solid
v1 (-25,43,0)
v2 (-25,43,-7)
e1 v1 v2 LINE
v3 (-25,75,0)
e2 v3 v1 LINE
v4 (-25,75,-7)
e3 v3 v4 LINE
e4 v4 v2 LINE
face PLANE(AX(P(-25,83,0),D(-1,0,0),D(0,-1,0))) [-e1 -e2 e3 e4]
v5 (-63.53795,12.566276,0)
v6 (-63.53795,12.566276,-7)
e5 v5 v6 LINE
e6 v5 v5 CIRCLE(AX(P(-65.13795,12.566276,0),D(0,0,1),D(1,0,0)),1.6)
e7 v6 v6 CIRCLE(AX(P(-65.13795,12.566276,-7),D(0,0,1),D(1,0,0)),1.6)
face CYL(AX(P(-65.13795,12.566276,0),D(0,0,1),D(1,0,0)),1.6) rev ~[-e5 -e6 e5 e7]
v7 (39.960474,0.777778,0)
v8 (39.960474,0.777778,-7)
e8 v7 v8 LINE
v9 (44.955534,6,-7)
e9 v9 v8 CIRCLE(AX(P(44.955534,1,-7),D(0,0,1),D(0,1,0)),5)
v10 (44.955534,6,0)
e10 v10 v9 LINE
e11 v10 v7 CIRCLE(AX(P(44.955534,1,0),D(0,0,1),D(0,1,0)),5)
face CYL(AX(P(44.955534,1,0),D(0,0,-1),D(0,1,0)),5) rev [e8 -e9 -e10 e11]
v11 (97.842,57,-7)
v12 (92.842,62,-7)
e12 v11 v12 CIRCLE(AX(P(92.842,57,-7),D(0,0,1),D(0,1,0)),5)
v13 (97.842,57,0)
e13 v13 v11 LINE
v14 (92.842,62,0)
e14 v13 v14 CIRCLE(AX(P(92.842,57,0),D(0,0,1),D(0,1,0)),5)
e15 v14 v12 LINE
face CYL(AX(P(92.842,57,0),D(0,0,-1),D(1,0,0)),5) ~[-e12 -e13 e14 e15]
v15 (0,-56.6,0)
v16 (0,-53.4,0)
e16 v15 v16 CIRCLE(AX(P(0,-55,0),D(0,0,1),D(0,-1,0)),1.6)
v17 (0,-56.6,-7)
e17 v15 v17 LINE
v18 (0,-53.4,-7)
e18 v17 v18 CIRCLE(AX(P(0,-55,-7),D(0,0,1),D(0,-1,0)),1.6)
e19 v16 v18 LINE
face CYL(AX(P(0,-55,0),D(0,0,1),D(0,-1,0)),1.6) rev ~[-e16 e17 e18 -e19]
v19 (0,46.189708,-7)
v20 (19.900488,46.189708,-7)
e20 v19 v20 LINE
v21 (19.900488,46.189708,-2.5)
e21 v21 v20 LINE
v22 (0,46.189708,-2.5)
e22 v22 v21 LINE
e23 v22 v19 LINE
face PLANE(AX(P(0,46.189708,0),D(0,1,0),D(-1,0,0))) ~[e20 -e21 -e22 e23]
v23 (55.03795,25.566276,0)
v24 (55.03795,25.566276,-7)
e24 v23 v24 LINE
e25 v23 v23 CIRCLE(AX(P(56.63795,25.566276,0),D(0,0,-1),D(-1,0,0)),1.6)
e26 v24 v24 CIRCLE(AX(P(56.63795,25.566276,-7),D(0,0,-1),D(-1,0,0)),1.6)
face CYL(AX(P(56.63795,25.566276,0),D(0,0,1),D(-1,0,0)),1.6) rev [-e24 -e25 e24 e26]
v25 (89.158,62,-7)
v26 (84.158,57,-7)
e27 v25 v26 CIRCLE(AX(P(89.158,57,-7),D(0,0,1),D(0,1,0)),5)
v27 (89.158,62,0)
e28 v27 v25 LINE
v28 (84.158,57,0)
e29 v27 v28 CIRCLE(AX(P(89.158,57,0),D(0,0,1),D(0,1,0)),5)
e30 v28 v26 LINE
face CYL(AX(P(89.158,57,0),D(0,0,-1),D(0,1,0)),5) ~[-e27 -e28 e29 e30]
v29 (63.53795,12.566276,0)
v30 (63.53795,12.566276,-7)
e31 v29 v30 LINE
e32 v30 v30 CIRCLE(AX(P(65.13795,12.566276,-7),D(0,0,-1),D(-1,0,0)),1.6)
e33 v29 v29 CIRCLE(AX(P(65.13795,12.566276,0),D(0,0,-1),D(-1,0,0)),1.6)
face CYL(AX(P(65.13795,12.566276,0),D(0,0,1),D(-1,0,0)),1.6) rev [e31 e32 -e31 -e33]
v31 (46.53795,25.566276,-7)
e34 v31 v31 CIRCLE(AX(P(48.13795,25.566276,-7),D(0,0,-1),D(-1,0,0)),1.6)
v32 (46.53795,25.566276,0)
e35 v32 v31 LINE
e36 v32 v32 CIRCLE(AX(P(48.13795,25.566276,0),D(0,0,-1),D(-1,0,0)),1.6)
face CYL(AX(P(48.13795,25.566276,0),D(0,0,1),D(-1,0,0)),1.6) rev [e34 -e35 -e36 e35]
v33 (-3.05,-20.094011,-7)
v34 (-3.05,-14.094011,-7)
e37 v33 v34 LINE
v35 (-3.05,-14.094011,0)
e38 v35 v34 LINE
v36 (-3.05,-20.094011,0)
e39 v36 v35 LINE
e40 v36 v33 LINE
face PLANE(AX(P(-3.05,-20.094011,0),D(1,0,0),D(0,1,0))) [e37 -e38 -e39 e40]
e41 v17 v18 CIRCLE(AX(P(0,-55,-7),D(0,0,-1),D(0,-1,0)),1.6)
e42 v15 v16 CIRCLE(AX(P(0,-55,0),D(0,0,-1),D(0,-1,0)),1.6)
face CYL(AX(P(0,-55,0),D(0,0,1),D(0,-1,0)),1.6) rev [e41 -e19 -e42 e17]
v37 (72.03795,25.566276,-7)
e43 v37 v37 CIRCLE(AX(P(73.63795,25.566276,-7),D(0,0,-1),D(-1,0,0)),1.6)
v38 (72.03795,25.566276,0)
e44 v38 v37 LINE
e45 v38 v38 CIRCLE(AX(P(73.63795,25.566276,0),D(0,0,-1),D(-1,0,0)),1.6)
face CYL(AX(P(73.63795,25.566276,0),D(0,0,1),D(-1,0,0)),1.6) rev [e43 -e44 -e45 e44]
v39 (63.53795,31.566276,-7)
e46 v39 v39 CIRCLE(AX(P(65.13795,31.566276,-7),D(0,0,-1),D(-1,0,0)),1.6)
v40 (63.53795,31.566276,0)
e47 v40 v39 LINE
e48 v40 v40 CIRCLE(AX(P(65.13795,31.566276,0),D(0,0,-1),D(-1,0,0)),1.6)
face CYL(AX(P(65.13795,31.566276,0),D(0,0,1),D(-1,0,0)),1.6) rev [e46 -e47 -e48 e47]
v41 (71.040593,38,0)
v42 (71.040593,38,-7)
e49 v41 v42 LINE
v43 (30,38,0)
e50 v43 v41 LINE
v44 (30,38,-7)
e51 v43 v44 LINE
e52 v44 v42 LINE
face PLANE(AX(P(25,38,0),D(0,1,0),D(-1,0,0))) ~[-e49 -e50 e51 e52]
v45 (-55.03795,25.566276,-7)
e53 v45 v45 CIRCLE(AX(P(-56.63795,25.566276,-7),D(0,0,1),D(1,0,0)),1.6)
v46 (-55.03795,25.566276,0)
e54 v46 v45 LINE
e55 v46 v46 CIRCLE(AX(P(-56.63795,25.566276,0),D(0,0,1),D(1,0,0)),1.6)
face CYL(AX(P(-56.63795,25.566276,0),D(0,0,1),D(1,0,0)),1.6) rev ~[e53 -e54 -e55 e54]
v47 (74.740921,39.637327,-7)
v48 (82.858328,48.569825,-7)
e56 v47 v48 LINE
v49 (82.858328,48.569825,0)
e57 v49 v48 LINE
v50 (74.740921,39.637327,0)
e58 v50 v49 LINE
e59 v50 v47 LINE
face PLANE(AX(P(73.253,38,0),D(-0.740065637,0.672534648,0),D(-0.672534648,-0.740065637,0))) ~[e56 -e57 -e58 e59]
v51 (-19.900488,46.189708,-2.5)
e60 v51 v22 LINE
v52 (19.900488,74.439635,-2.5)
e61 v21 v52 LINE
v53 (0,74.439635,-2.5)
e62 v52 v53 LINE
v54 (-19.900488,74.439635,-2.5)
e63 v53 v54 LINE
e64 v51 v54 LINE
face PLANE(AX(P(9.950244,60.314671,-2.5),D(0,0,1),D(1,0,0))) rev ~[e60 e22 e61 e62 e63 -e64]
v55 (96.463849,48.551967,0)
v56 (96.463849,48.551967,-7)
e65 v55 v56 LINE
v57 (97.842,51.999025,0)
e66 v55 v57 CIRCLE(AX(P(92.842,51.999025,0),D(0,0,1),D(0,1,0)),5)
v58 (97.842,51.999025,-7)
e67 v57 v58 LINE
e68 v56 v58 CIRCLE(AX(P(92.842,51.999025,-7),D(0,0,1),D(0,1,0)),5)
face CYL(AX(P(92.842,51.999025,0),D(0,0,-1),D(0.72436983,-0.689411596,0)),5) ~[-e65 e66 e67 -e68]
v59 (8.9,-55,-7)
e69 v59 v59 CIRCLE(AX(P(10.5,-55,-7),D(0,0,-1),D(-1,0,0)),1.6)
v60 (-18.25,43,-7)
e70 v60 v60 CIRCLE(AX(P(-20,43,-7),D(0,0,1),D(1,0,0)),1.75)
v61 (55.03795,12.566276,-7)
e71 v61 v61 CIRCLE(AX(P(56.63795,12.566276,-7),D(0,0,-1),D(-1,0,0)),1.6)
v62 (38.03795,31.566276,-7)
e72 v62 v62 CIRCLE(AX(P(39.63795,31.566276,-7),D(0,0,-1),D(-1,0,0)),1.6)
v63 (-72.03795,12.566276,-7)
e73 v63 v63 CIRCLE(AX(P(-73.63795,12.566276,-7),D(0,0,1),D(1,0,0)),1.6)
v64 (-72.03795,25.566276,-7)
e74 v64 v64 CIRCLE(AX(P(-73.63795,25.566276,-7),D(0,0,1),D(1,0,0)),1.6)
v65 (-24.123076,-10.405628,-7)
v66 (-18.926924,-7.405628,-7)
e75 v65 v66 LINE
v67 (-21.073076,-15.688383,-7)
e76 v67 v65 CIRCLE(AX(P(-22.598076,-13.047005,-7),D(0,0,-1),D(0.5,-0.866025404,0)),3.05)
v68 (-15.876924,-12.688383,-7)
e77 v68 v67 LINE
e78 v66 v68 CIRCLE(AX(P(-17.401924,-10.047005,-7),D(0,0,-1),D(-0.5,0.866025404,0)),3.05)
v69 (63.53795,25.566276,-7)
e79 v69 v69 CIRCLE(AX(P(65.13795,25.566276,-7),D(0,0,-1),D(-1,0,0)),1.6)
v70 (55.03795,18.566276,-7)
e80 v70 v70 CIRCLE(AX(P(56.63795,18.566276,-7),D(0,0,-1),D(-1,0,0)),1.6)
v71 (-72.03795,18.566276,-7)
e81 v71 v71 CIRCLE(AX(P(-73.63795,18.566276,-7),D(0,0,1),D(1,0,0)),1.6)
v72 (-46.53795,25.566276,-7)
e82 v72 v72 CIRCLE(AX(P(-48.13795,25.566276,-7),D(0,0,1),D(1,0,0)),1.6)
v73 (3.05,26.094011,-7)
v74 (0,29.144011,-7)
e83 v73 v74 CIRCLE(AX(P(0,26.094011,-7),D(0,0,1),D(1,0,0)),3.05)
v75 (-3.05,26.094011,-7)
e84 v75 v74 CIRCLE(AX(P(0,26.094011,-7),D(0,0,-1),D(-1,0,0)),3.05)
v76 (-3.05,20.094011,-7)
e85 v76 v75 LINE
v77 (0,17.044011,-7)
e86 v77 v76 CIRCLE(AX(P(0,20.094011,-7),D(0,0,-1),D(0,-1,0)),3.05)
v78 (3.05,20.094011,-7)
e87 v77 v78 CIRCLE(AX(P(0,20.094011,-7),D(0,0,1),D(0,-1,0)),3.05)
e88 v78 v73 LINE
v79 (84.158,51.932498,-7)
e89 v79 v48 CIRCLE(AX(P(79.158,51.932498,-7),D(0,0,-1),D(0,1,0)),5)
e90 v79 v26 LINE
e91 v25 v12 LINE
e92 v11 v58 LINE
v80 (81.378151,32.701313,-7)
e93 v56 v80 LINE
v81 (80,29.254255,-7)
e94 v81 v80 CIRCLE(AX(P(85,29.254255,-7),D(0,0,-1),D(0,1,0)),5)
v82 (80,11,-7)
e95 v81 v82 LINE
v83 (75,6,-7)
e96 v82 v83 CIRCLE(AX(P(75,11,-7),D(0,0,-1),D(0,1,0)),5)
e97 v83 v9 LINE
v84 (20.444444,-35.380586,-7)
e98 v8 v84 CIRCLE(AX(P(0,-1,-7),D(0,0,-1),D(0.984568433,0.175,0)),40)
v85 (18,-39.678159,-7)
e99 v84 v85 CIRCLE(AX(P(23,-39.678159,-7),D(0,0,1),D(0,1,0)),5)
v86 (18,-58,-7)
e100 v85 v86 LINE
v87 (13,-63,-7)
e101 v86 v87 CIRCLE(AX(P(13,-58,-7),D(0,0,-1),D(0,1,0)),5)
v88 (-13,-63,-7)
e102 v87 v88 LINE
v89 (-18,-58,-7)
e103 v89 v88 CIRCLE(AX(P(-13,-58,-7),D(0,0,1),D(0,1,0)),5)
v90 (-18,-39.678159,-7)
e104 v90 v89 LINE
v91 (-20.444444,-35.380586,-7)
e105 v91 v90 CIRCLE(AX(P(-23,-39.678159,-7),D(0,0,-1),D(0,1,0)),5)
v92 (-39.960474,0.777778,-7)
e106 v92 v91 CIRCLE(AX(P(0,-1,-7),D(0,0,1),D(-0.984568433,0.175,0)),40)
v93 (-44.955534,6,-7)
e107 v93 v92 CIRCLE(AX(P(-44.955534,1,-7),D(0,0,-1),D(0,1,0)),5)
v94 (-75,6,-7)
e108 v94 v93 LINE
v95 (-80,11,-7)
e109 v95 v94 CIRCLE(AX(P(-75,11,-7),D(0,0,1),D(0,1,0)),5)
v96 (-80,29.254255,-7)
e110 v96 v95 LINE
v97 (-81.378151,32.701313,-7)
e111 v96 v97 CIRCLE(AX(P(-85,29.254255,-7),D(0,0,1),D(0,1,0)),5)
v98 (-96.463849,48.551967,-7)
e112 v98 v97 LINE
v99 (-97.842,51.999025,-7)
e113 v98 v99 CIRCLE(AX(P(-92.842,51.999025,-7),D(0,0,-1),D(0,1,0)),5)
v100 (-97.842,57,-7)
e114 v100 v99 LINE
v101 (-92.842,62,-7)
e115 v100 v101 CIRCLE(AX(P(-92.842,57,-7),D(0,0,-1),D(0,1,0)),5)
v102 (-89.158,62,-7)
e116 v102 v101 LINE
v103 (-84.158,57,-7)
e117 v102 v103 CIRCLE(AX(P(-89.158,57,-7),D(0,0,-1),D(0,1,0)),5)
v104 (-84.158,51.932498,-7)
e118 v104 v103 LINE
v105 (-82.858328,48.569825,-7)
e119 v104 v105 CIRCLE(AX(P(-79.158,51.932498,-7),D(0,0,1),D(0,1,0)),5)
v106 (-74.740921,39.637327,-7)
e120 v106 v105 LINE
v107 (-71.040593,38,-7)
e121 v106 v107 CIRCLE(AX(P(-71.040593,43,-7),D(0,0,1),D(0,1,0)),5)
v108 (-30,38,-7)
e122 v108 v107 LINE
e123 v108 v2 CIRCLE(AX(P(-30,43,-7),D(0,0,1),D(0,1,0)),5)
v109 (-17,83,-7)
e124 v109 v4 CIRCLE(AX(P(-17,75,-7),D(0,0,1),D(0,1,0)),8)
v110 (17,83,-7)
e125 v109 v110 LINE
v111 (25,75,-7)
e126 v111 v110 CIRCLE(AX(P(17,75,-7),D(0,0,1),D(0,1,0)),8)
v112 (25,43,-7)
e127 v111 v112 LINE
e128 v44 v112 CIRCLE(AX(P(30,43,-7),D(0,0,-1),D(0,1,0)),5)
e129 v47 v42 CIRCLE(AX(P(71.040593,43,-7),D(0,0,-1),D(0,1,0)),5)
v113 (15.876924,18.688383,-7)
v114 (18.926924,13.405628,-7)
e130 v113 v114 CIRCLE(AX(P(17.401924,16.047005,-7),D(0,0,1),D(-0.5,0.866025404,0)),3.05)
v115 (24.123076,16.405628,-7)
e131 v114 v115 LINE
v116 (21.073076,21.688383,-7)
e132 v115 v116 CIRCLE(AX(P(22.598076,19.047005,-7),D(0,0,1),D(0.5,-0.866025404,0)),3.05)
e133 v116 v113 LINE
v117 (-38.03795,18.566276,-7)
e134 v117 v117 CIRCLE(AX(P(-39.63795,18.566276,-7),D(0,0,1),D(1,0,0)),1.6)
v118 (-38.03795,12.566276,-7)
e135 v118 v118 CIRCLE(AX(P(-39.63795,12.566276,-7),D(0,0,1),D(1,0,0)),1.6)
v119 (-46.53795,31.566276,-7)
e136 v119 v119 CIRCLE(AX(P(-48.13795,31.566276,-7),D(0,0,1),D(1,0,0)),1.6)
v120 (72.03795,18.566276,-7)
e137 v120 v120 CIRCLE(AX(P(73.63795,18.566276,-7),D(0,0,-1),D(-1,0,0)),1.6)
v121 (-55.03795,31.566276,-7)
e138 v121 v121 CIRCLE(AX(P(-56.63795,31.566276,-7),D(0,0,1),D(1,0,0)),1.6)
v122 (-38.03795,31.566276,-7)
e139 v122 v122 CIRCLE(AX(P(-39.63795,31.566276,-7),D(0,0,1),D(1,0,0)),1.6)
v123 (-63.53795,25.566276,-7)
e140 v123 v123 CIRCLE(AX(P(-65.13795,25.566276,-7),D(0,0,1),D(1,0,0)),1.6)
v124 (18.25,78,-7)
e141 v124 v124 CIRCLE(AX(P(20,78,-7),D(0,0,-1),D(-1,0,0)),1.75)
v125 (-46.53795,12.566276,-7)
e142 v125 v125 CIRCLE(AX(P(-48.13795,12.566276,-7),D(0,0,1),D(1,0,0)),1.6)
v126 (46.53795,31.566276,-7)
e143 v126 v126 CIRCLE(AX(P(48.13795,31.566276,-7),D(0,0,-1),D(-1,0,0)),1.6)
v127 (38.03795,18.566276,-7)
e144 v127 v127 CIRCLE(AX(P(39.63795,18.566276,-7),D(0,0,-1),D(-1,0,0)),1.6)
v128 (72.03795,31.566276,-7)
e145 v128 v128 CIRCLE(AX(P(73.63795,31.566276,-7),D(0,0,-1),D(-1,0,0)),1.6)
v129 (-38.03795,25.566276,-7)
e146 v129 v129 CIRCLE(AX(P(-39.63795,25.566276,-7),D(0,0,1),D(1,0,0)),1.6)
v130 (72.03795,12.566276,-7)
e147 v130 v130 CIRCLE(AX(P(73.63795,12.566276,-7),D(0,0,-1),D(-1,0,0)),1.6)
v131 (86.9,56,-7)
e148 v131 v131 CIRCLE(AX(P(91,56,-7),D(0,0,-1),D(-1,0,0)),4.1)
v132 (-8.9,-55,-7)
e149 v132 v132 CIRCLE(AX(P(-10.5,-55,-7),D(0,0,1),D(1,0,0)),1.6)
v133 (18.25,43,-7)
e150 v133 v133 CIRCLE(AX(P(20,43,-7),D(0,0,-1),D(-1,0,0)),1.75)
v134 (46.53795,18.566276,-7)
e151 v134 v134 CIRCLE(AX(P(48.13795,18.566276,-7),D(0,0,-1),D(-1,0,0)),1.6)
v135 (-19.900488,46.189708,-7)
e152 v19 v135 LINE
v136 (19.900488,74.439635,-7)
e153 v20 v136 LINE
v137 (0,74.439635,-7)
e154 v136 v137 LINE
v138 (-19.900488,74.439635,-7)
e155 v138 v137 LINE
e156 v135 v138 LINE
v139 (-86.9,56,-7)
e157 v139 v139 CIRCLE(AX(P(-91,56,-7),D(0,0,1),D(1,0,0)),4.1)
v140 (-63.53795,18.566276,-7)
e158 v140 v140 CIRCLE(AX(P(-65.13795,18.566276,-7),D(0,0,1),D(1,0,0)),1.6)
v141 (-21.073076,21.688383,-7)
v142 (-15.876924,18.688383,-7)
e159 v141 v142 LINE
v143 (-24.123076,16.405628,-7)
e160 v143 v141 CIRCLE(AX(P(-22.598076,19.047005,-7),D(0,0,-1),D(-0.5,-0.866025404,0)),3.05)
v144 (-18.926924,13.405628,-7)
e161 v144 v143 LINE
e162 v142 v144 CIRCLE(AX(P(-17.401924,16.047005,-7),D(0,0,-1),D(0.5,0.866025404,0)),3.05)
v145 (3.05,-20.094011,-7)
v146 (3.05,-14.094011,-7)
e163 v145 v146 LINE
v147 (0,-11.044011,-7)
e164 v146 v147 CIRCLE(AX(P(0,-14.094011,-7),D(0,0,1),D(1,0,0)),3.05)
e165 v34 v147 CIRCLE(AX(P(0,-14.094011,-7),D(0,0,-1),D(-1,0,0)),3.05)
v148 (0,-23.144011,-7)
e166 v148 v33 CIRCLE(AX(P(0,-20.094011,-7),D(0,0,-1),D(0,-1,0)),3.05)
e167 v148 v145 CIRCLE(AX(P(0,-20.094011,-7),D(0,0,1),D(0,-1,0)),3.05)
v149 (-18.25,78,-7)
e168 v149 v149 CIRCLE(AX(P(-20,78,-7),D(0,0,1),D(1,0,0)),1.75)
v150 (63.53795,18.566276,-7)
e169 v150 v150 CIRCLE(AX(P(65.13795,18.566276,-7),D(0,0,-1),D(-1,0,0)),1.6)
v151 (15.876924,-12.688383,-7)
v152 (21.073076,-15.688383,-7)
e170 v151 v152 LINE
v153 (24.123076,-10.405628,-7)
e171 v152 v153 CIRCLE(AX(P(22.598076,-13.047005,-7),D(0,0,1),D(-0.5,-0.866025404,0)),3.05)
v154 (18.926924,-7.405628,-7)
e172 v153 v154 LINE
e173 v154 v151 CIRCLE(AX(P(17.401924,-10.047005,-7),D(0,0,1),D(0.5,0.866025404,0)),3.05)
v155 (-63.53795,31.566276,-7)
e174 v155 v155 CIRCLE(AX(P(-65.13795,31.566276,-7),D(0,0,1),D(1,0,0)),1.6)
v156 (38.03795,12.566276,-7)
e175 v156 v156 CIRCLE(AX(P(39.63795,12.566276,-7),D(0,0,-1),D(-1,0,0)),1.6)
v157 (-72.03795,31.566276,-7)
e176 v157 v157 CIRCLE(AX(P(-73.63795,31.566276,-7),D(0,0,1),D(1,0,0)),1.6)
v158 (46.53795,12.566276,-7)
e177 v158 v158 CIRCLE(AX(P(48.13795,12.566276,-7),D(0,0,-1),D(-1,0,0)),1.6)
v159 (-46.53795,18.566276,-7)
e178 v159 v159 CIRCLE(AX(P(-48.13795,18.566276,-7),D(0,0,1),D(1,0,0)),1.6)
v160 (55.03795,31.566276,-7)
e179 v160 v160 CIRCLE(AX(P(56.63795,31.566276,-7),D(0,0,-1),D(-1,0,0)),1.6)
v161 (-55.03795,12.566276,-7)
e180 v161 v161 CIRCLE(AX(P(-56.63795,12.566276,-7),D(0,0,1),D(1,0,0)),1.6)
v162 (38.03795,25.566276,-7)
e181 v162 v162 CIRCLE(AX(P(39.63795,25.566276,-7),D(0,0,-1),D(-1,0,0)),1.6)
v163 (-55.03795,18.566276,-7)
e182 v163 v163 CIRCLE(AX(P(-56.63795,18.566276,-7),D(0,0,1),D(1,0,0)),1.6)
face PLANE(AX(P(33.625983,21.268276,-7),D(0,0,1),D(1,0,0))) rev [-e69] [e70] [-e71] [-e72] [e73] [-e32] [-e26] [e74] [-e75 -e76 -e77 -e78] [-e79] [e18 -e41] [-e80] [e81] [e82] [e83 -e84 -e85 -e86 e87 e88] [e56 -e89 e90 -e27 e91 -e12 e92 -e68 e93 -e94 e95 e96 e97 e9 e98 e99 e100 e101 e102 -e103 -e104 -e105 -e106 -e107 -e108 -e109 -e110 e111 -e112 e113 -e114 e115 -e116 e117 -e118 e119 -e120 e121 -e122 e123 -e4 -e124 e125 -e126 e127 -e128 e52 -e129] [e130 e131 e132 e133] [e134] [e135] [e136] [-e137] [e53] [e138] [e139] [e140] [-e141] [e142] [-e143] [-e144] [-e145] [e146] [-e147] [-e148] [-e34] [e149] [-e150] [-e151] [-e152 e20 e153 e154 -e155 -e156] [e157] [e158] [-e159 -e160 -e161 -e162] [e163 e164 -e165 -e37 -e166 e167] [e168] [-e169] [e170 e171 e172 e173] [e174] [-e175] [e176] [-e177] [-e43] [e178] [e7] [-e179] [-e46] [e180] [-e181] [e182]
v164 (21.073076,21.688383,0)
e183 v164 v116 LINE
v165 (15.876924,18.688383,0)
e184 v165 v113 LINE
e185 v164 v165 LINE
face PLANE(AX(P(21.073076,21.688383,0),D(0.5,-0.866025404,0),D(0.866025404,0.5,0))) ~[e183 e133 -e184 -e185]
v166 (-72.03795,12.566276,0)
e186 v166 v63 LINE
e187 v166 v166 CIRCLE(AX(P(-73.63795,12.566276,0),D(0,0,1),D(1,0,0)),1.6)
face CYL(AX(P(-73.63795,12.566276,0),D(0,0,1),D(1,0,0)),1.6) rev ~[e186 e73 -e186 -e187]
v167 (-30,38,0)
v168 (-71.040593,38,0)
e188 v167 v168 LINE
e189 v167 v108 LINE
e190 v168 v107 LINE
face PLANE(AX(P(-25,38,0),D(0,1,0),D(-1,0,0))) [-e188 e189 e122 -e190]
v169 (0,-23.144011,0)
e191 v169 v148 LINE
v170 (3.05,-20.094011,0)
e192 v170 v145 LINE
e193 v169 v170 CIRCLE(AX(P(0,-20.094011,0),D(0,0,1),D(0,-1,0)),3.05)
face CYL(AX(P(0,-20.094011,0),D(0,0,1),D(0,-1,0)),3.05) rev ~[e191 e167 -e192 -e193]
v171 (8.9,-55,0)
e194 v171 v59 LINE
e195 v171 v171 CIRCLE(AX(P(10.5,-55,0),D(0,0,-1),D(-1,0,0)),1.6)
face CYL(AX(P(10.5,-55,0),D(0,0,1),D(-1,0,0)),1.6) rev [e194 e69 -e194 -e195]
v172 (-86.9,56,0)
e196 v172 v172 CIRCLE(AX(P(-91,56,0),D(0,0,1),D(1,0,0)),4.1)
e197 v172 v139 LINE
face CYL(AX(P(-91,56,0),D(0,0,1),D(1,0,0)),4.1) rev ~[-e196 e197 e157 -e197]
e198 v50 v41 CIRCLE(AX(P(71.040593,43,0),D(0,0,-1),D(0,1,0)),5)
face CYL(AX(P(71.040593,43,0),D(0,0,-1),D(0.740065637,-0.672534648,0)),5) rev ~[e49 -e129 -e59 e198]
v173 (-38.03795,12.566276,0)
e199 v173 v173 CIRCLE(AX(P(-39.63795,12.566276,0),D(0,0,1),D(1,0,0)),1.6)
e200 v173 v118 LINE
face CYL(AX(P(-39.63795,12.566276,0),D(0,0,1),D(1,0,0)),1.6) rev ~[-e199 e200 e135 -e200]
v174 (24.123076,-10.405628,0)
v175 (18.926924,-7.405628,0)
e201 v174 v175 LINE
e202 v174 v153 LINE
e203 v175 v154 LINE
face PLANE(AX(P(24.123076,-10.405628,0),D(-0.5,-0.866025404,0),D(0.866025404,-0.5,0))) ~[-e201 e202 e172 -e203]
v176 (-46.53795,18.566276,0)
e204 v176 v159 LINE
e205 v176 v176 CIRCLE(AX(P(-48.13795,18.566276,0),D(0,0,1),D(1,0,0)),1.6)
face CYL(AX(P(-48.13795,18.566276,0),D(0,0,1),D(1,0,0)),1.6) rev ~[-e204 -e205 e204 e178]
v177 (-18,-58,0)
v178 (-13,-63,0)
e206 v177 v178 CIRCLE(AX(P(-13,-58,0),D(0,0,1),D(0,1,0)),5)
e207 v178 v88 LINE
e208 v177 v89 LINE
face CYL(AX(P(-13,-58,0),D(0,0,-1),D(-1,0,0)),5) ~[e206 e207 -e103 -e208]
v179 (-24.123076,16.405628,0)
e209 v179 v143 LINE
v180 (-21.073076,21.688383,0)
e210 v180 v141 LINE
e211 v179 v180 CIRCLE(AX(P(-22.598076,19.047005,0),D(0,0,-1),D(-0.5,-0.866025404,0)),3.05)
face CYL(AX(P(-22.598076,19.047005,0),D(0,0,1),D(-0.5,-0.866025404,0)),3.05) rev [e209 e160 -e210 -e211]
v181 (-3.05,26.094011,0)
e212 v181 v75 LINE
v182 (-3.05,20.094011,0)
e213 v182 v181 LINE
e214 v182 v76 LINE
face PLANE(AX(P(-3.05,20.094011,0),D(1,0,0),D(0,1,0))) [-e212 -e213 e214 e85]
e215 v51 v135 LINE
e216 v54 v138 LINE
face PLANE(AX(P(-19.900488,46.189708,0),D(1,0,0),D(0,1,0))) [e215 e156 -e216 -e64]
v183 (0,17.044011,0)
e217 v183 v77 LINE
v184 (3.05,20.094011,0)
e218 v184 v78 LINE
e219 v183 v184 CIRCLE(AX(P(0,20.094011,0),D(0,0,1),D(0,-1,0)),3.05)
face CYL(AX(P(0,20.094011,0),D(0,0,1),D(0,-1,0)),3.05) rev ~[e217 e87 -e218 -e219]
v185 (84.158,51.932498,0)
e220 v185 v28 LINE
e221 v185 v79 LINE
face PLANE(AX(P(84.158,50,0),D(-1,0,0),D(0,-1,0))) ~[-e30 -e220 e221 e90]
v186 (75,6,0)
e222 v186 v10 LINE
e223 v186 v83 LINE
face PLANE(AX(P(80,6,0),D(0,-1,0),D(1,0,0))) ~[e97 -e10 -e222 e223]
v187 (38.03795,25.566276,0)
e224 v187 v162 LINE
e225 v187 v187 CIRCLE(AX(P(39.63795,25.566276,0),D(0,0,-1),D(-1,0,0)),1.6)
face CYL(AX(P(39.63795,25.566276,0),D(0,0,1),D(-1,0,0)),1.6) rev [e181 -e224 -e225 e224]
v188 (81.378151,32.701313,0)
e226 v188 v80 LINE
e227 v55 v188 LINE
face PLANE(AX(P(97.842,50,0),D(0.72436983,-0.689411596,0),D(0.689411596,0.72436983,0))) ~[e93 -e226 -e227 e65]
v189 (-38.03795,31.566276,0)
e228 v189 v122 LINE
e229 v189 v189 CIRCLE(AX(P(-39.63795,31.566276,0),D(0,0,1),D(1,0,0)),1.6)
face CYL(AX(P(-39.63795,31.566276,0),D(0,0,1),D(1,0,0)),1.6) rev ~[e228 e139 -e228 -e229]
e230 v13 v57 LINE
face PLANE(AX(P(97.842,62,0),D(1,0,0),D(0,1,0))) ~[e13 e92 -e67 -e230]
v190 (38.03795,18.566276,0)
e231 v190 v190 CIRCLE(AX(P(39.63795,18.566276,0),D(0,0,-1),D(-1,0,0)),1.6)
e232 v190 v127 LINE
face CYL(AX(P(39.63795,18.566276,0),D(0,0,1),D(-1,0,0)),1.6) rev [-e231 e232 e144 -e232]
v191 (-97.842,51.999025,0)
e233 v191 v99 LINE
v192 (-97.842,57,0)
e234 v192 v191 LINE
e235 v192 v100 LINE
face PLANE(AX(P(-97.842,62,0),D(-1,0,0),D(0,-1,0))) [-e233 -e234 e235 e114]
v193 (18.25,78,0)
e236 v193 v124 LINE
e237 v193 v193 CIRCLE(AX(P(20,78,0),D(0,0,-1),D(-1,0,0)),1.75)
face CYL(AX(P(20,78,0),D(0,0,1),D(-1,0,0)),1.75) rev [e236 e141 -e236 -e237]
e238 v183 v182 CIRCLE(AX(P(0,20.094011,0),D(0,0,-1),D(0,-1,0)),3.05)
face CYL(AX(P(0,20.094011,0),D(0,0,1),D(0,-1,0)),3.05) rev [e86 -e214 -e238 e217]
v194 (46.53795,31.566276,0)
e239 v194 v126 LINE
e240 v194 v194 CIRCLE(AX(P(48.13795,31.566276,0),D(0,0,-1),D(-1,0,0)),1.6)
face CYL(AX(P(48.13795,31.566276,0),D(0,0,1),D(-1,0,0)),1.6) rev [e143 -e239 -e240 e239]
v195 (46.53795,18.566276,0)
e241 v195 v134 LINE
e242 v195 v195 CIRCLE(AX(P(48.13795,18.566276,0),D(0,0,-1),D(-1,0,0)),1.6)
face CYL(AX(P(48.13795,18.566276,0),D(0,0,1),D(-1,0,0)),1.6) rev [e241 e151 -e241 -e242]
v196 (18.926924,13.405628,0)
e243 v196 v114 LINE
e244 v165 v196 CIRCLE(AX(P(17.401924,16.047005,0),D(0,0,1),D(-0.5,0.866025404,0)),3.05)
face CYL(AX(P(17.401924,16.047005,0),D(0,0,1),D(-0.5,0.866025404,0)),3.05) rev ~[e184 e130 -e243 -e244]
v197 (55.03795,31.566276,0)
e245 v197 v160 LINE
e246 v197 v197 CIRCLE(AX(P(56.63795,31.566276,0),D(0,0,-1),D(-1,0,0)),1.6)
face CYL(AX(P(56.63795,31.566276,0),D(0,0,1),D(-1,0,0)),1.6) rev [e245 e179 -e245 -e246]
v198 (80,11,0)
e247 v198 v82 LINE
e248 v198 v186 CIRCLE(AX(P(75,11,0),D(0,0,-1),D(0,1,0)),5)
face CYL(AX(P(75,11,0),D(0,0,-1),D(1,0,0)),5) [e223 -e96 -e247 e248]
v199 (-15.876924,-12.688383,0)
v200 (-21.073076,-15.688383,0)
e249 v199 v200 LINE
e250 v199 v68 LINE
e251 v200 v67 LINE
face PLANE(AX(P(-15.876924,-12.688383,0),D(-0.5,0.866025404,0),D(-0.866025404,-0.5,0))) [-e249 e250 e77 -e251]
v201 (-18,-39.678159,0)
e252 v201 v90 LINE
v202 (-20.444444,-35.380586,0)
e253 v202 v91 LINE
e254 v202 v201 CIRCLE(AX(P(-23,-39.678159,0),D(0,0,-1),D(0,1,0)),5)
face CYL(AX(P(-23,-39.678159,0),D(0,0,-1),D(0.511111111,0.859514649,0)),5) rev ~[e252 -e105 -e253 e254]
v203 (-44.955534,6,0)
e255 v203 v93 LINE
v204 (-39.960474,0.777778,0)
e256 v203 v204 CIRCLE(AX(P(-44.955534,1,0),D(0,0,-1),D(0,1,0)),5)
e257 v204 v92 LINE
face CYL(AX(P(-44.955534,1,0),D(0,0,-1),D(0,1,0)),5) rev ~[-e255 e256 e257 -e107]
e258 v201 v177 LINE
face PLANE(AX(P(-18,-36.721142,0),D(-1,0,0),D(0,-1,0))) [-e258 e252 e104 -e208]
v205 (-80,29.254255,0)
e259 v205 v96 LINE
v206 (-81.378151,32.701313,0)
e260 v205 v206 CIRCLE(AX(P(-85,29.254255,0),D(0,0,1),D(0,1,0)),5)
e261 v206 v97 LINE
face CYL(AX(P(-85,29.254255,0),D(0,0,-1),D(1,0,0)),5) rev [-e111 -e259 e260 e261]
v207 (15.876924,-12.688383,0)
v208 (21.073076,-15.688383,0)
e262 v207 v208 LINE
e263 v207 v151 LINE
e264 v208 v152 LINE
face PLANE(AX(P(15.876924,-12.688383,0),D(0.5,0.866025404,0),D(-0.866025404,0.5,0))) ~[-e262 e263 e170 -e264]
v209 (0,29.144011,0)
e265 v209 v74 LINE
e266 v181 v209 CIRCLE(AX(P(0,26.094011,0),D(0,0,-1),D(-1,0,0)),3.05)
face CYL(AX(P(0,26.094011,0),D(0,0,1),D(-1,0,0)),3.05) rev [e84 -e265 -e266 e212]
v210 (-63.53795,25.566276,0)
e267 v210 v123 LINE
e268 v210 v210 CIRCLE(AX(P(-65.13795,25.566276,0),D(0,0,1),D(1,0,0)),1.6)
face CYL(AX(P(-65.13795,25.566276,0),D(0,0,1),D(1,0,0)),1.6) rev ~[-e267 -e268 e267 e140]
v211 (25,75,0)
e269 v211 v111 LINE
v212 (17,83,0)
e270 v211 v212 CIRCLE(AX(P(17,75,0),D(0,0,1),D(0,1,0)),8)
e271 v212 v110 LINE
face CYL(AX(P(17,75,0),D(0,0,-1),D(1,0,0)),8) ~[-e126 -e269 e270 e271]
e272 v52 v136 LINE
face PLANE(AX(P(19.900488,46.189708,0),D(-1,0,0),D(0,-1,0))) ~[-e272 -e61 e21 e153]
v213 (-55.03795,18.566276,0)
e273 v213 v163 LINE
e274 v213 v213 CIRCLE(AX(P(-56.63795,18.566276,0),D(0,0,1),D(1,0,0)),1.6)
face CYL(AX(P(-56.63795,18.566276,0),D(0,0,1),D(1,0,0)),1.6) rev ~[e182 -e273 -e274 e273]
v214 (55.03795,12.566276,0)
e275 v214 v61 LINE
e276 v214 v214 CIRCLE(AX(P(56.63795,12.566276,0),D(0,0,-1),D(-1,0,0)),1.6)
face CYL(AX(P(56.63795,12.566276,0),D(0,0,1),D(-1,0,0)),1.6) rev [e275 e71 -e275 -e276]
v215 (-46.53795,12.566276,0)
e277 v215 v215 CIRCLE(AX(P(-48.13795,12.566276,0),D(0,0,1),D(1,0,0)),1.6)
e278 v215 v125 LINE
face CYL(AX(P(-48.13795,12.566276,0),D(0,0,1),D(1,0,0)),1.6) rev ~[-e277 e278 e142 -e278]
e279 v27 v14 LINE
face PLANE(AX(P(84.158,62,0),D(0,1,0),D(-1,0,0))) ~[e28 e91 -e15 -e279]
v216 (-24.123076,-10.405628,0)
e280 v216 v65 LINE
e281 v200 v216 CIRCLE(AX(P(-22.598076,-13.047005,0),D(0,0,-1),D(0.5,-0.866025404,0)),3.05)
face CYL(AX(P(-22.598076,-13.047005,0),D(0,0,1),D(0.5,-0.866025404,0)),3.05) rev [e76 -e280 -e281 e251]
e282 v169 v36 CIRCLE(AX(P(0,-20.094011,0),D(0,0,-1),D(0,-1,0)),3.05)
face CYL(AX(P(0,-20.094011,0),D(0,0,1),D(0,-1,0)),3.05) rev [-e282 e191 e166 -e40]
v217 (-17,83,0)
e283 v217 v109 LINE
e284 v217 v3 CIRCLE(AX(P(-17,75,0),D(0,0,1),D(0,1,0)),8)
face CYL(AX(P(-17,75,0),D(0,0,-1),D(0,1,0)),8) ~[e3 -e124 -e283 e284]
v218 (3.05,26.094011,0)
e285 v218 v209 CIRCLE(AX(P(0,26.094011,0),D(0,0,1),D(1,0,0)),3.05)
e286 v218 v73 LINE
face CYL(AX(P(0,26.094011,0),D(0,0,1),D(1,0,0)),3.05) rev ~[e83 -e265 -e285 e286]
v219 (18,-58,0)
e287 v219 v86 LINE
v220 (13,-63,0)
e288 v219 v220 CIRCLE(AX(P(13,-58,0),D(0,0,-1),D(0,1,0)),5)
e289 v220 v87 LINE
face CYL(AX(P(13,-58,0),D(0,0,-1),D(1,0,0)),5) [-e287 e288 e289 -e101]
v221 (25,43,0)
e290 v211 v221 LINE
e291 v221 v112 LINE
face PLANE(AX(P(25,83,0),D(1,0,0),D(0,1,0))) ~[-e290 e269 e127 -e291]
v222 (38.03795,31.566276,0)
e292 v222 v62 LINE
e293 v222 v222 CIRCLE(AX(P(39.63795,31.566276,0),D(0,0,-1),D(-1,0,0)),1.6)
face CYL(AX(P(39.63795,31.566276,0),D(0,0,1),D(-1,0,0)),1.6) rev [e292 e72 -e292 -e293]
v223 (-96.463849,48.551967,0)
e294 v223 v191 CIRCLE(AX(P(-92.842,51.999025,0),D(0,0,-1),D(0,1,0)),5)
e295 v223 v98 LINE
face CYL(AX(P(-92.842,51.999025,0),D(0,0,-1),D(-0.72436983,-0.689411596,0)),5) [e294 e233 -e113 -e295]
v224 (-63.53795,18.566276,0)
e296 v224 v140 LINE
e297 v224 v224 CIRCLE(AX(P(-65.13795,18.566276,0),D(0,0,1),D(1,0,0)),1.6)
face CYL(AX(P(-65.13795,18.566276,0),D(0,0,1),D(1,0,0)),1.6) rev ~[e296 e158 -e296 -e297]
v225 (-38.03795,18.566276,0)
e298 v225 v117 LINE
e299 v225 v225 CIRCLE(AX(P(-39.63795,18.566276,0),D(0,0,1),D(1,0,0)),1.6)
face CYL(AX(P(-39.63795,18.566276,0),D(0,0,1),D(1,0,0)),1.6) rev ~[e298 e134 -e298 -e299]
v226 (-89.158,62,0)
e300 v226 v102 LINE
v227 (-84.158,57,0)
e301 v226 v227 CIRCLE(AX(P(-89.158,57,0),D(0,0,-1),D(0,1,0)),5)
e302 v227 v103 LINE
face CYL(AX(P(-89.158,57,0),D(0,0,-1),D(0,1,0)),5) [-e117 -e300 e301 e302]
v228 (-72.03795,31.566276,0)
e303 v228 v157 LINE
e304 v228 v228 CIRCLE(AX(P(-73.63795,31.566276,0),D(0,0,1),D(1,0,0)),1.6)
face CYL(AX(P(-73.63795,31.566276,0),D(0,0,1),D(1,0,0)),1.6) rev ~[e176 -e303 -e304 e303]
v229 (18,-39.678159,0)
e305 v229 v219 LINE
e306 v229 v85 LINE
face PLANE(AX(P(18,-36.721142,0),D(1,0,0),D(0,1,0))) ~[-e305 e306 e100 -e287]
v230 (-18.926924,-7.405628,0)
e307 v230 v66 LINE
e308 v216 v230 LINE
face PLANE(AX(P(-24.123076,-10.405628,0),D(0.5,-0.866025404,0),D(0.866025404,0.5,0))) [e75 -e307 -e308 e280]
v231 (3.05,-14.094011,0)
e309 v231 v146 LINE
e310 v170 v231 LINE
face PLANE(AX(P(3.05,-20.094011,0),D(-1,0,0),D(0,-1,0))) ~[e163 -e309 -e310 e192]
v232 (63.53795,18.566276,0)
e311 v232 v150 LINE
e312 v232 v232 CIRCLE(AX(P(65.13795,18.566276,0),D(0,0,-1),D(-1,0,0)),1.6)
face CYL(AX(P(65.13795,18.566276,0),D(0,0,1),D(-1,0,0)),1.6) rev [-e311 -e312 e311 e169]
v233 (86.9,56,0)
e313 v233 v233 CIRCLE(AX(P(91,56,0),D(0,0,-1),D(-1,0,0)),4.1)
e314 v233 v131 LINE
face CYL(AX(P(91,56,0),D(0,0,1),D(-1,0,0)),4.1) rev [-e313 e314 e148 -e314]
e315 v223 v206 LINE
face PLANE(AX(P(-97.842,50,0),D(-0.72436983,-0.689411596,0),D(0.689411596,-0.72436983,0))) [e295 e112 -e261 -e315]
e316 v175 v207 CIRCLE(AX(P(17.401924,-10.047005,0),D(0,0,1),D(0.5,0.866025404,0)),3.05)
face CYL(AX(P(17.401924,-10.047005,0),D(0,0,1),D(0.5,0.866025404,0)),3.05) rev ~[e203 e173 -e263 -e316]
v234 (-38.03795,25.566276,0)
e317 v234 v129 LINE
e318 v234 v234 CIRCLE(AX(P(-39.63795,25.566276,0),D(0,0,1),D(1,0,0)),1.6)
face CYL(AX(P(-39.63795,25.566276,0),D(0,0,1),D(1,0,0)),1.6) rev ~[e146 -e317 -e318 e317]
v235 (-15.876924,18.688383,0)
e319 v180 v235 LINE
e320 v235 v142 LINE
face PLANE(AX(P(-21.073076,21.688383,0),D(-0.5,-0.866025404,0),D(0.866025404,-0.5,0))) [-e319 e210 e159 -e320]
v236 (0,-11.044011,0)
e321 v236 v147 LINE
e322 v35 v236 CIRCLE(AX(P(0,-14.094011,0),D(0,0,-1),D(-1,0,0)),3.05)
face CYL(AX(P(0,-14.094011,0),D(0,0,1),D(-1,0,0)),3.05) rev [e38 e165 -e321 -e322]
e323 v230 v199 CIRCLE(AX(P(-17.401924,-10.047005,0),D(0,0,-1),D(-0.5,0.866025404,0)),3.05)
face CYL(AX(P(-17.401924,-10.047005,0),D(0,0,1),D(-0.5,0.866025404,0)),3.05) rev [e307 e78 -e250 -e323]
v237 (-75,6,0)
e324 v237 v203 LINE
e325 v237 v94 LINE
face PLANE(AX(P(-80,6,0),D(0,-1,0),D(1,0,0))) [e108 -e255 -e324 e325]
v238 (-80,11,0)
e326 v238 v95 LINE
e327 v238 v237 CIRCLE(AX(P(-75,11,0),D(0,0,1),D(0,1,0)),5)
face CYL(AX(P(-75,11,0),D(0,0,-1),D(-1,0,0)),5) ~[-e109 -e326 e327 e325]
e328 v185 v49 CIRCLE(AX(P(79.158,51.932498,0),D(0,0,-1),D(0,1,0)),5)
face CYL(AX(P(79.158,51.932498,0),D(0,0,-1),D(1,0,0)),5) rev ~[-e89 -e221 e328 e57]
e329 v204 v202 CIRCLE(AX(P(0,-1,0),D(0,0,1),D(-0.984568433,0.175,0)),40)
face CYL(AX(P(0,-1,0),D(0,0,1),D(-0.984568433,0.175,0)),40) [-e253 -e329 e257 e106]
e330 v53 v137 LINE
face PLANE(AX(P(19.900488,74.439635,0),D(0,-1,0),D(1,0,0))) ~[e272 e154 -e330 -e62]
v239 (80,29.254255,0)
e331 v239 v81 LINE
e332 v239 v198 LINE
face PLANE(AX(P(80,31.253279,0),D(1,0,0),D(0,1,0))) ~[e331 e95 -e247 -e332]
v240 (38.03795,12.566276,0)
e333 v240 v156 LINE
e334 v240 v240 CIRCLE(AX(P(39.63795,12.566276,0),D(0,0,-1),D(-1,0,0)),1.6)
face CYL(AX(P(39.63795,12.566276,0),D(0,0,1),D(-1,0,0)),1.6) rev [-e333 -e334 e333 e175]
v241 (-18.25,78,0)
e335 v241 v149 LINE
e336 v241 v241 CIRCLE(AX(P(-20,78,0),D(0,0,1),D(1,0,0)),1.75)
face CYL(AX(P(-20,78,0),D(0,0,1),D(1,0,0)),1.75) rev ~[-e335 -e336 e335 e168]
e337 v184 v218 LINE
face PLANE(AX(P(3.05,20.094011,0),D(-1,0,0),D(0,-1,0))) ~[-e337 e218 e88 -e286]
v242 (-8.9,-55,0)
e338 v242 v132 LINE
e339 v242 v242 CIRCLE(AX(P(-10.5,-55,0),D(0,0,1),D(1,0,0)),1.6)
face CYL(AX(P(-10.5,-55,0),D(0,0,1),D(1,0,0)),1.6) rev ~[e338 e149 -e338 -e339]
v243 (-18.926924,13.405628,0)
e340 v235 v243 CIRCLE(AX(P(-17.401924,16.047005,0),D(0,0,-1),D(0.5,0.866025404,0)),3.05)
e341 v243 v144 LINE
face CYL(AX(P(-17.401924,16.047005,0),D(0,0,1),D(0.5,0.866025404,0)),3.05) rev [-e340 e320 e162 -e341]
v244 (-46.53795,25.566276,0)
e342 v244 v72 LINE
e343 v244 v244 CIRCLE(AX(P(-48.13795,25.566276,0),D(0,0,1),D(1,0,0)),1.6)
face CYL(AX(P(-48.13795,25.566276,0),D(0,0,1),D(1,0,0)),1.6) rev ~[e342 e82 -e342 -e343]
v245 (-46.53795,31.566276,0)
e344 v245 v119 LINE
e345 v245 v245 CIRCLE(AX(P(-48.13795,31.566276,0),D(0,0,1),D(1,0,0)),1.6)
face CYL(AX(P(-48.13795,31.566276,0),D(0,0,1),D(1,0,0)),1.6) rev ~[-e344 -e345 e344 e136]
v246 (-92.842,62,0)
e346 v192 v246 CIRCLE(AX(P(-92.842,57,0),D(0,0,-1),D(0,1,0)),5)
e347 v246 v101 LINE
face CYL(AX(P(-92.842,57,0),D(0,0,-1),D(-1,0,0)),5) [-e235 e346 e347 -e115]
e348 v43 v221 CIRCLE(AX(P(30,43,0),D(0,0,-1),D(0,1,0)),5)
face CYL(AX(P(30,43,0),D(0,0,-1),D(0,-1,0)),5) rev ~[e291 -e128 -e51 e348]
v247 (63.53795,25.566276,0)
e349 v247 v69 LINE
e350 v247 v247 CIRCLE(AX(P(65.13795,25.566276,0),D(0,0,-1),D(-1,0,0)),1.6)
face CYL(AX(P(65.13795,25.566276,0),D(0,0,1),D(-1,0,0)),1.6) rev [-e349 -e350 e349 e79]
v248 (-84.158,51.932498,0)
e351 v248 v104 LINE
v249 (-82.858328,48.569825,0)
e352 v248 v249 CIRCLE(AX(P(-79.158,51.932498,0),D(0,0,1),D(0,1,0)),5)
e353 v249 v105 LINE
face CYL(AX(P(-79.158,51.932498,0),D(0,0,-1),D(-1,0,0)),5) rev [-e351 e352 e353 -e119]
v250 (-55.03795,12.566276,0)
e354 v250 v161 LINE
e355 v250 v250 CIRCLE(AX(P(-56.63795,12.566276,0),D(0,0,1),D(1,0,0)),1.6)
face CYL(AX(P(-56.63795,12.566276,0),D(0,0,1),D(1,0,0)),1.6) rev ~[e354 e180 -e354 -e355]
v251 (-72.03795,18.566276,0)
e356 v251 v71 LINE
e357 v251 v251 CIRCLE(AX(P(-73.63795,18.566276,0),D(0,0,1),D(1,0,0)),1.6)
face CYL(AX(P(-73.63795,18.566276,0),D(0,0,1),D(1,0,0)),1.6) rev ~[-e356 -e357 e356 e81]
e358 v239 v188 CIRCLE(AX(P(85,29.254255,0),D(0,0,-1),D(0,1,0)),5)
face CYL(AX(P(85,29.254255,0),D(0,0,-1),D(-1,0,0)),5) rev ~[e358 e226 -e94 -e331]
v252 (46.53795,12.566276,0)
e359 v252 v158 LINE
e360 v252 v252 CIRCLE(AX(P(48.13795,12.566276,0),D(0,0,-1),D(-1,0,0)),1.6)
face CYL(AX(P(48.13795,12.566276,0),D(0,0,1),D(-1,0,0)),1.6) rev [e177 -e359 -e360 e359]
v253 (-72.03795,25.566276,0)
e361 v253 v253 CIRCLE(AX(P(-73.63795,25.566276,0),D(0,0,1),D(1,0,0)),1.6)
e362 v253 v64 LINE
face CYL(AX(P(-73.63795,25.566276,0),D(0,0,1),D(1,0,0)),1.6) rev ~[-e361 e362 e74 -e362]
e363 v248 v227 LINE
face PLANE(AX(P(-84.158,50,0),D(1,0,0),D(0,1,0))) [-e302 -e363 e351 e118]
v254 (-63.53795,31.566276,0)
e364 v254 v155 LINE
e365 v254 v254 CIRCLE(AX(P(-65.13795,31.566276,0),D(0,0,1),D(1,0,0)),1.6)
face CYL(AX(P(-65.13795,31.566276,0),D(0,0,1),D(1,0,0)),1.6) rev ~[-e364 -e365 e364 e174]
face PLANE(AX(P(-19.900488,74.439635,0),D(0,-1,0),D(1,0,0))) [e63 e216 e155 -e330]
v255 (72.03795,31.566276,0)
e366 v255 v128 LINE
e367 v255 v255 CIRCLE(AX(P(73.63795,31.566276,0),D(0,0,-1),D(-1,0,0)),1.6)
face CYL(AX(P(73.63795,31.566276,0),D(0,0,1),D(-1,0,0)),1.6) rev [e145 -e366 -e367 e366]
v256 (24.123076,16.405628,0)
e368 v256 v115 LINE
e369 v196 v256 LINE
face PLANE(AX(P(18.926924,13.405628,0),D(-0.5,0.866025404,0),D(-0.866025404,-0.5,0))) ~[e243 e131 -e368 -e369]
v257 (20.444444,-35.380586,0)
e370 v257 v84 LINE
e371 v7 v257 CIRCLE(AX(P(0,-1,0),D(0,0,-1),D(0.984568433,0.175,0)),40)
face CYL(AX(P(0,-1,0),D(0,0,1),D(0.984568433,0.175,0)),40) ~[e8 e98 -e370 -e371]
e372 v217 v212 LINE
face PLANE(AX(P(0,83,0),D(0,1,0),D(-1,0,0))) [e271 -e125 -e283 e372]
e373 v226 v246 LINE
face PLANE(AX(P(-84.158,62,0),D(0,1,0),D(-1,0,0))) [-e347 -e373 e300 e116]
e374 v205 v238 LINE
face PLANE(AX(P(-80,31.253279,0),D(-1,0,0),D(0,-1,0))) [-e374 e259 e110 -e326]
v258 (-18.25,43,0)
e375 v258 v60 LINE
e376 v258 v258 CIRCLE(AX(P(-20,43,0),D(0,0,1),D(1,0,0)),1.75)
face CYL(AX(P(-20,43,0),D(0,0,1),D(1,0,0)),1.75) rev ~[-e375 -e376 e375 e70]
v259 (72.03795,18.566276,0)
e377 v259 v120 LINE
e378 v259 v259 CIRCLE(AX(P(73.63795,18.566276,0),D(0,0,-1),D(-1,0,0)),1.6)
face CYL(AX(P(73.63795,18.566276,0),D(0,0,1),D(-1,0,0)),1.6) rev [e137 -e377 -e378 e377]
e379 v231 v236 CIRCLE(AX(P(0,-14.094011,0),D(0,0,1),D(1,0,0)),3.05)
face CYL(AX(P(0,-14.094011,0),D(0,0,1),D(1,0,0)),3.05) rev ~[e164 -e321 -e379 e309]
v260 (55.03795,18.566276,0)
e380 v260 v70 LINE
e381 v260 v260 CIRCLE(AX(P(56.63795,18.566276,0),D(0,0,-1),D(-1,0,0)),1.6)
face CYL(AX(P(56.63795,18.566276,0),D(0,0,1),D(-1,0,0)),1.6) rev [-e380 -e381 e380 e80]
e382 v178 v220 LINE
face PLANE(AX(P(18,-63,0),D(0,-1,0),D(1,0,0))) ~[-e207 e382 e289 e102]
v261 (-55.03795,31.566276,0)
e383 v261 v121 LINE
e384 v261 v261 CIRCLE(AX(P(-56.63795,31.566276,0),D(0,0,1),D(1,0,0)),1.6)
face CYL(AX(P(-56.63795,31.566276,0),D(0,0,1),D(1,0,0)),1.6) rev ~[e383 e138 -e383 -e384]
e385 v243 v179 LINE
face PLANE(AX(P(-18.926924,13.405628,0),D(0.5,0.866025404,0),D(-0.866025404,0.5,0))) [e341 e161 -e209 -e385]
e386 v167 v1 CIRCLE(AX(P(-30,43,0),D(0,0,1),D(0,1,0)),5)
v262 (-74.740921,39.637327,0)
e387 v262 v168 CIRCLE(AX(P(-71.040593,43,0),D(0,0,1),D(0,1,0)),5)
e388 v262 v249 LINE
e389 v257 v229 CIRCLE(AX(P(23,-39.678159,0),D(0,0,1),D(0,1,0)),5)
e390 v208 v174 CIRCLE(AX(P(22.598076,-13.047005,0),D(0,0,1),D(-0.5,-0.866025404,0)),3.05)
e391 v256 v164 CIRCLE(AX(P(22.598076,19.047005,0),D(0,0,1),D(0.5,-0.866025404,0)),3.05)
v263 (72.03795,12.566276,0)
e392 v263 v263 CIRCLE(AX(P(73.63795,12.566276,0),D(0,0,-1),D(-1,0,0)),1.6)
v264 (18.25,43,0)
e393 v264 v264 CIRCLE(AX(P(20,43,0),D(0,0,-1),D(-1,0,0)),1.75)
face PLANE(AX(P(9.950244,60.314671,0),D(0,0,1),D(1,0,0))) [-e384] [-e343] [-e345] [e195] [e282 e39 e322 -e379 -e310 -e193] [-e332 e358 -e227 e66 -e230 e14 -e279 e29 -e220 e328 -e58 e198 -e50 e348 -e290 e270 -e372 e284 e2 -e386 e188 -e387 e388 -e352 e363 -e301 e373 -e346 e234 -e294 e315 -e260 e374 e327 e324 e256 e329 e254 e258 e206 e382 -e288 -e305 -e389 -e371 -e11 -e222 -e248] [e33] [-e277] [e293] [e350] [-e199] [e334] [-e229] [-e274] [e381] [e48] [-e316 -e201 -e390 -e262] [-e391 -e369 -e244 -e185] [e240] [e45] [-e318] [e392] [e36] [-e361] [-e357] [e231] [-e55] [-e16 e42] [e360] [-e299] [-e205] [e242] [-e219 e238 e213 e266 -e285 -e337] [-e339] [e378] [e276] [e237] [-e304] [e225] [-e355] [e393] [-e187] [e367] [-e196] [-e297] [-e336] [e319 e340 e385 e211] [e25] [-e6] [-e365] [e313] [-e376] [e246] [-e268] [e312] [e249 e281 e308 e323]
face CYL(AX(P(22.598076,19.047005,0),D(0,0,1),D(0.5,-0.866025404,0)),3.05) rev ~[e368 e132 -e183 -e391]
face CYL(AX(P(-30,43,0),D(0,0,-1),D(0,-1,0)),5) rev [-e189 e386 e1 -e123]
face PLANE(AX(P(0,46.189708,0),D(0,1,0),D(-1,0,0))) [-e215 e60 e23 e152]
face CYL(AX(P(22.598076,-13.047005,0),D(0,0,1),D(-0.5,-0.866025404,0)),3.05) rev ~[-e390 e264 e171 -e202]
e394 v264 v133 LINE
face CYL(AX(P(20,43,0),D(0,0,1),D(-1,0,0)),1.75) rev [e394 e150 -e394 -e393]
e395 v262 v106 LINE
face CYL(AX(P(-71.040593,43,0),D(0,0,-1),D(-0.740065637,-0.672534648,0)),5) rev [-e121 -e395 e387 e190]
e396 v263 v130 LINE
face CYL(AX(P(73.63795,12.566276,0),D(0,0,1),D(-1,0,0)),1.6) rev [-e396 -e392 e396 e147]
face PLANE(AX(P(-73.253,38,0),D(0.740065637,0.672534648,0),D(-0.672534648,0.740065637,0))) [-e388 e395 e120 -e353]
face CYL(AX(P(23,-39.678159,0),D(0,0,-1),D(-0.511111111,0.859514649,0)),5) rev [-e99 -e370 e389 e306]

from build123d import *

# Parameters (mm, degrees)
F0_R     = 1.6
F0_R_2   = 4.1
F0_R_3   = 1.75
F1_DEPTH = 7
F2_R     = 5
F5_R     = 8
F0_W     = 19.9004877359
F0_H     = 28.2499268651
F6_DEPTH = 2.5


# Not quite as in the source:
# - two fillets or chamfers of one size are made in one step
# - a feature names something its author has since deleted; it is built from what else it names


with BuildPart() as f1:
    # F0 (on Top) → F1 (new body)
    with BuildSketch(Plane.XY):
        with BuildLine():
            Line((-80, 31.2532794885), (-80, 6))
            Line((-80, 6), (-39.382737335, 6))
            ThreePointArc((-39.382737335, 6), (-35.7696607995, -18.9033897988), (-18, -36.721142199))
            Line((-18, -36.721142199), (-18, -63))
            Line((-18, -63), (0, -63))
            Line((0, -63), (0, -56.6))
            ThreePointArc((0, -56.6), (-1.6, -55), (0, -53.4))
            Line((0, -53.4), (0, -23.1440107676))
            ThreePointArc((0, -23.1440107676), (-2.1566756826, -22.2506864502), (-3.05, -20.0940107676))
            Line((-3.05, -20.0940107676), (-3.05, -14.0940107676))
            ThreePointArc((-3.05, -14.0940107676), (-2.1566756826, -11.937335085), (0, -11.0440107676))
            Line((0, -11.0440107676), (0, 17.0440107676))
            ThreePointArc((0, 17.0440107676), (-2.1566756826, 17.937335085), (-3.05, 20.0940107676))
            Line((-3.05, 20.0940107676), (-3.05, 26.0940107676))
            ThreePointArc((-3.05, 26.0940107676), (-2.1566756826, 28.2506864502), (0, 29.1440107676))
            Line((0, 29.1440107676), (0, 38))
            Line((0, 38), (0, 46.1897078156))
            Line((0, 46.1897078156), (-19.9004877359, 46.1897078156))
            Line((-19.9004877359, 46.1897078156), (-19.9004877359, 74.4396346807))
            Line((-19.9004877359, 74.4396346807), (0, 74.4396346807))
            Line((0, 74.4396346807), (0, 83))
            Line((0, 83), (-25, 83))
            Line((-25, 83), (-25, 38))
            Line((-25, 38), (-73.253, 38))
            Line((-73.253, 38), (-84.158, 50))
            Line((-84.158, 50), (-84.158, 62))
            Line((-84.158, 62), (-97.842, 62))
            Line((-97.842, 62), (-97.842, 50))
            Line((-97.842, 50), (-80, 31.2532794885))
        make_face()
        with Locations((-10.5, -55)):
            Circle(F0_R, mode=Mode.SUBTRACT)
        with BuildLine():
            ThreePointArc((-21.0730762114, -15.6883828653), (-25.2394536929, -14.5720053838), (-24.1230762114, -10.4056279022))
            Line((-24.1230762114, -10.4056279022), (-18.9269237886, -7.4056279022))
            ThreePointArc((-18.9269237886, -7.4056279022), (-14.7605463071, -8.5220053838), (-15.8769237886, -12.6883828653))
            Line((-15.8769237886, -12.6883828653), (-21.0730762114, -15.6883828653))
        make_face(mode=Mode.SUBTRACT)
        with Locations((-73.6379495263, 12.566276442)):
            Circle(F0_R, mode=Mode.SUBTRACT)
        with Locations((-73.6379495263, 18.566276442)):
            Circle(F0_R, mode=Mode.SUBTRACT)
        with Locations((-73.6379495263, 25.566276442)):
            Circle(F0_R, mode=Mode.SUBTRACT)
        with Locations((-73.6379495263, 31.566276442)):
            Circle(F0_R, mode=Mode.SUBTRACT)
        with Locations((-65.1379495263, 12.566276442)):
            Circle(F0_R, mode=Mode.SUBTRACT)
        with Locations((-65.1379495263, 18.566276442)):
            Circle(F0_R, mode=Mode.SUBTRACT)
        with Locations((-56.6379495263, 12.566276442)):
            Circle(F0_R, mode=Mode.SUBTRACT)
        with Locations((-56.6379495263, 18.566276442)):
            Circle(F0_R, mode=Mode.SUBTRACT)
        with Locations((-65.1379495263, 25.566276442)):
            Circle(F0_R, mode=Mode.SUBTRACT)
        with Locations((-56.6379495263, 25.566276442)):
            Circle(F0_R, mode=Mode.SUBTRACT)
        with Locations((-48.1379495263, 12.566276442)):
            Circle(F0_R, mode=Mode.SUBTRACT)
        with Locations((-48.1379495263, 18.566276442)):
            Circle(F0_R, mode=Mode.SUBTRACT)
        with Locations((-39.6379495263, 12.566276442)):
            Circle(F0_R, mode=Mode.SUBTRACT)
        with Locations((-39.6379495263, 18.566276442)):
            Circle(F0_R, mode=Mode.SUBTRACT)
        with Locations((-48.1379495263, 25.566276442)):
            Circle(F0_R, mode=Mode.SUBTRACT)
        with Locations((-39.6379495263, 25.566276442)):
            Circle(F0_R, mode=Mode.SUBTRACT)
        with Locations((-65.1379495263, 31.566276442)):
            Circle(F0_R, mode=Mode.SUBTRACT)
        with Locations((-56.6379495263, 31.566276442)):
            Circle(F0_R, mode=Mode.SUBTRACT)
        with Locations((-48.1379495263, 31.566276442)):
            Circle(F0_R, mode=Mode.SUBTRACT)
        with Locations((-39.6379495263, 31.566276442)):
            Circle(F0_R, mode=Mode.SUBTRACT)
        with Locations((-91, 56)):
            Circle(F0_R_2, mode=Mode.SUBTRACT)
        with BuildLine():
            Line((-18.9269237886, 13.4056279022), (-24.1230762114, 16.4056279022))
            ThreePointArc((-24.1230762114, 16.4056279022), (-25.2394536929, 20.5720053838), (-21.0730762114, 21.6883828653))
            Line((-21.0730762114, 21.6883828653), (-15.8769237886, 18.6883828653))
            ThreePointArc((-15.8769237886, 18.6883828653), (-14.7605463071, 14.5220053838), (-18.9269237886, 13.4056279022))
        make_face(mode=Mode.SUBTRACT)
        with Locations((-20, 43)):
            Circle(F0_R_3, mode=Mode.SUBTRACT)
        with Locations((-20, 78)):
            Circle(F0_R_3, mode=Mode.SUBTRACT)
    extrude(amount=-F1_DEPTH)

    # F2
    f2_edges = [f1.edges().sort_by_distance(p)[0] for p in [
        (-39.382737, 6, -3.5),
        (-80, 6, -3.5),
        (-18, -36.721142, -3.5),
        (-18, -63, -3.5),
        (-73.253, 38, -3.5),
        (-84.158, 50, -3.5),
        (-84.158, 62, -3.5),
        (-97.842, 62, -3.5),
        (-97.842, 50, -3.5),
        (-80, 31.253279, -3.5),
        (-25, 38, -3.5),
    ]]
    fillet(f2_edges, radius=F2_R)

    # F3: F1 across plane


with BuildPart() as f1_1:
    add(f1.part)
    add(f1.part.mirror(Plane.YZ))

    # F5
    f5_edges = [f1_1.edges().sort_by_distance(p)[0] for p in [
        (-25, 83, -3.5),
        (25, 83, -3.5),
    ]]
    fillet(f5_edges, radius=F5_R)

    # F0 (on Top) → F6 (join)
    with BuildSketch(Plane.XY):
        with Locations((9.9502438679, 60.3146712482)):
            Rectangle(F0_W, F0_H)
        with Locations((-9.9502438679, 60.3146712482)):
            Rectangle(F0_W, F0_H)
    extrude(amount=-F6_DEPTH)


solid = f1_1.part
